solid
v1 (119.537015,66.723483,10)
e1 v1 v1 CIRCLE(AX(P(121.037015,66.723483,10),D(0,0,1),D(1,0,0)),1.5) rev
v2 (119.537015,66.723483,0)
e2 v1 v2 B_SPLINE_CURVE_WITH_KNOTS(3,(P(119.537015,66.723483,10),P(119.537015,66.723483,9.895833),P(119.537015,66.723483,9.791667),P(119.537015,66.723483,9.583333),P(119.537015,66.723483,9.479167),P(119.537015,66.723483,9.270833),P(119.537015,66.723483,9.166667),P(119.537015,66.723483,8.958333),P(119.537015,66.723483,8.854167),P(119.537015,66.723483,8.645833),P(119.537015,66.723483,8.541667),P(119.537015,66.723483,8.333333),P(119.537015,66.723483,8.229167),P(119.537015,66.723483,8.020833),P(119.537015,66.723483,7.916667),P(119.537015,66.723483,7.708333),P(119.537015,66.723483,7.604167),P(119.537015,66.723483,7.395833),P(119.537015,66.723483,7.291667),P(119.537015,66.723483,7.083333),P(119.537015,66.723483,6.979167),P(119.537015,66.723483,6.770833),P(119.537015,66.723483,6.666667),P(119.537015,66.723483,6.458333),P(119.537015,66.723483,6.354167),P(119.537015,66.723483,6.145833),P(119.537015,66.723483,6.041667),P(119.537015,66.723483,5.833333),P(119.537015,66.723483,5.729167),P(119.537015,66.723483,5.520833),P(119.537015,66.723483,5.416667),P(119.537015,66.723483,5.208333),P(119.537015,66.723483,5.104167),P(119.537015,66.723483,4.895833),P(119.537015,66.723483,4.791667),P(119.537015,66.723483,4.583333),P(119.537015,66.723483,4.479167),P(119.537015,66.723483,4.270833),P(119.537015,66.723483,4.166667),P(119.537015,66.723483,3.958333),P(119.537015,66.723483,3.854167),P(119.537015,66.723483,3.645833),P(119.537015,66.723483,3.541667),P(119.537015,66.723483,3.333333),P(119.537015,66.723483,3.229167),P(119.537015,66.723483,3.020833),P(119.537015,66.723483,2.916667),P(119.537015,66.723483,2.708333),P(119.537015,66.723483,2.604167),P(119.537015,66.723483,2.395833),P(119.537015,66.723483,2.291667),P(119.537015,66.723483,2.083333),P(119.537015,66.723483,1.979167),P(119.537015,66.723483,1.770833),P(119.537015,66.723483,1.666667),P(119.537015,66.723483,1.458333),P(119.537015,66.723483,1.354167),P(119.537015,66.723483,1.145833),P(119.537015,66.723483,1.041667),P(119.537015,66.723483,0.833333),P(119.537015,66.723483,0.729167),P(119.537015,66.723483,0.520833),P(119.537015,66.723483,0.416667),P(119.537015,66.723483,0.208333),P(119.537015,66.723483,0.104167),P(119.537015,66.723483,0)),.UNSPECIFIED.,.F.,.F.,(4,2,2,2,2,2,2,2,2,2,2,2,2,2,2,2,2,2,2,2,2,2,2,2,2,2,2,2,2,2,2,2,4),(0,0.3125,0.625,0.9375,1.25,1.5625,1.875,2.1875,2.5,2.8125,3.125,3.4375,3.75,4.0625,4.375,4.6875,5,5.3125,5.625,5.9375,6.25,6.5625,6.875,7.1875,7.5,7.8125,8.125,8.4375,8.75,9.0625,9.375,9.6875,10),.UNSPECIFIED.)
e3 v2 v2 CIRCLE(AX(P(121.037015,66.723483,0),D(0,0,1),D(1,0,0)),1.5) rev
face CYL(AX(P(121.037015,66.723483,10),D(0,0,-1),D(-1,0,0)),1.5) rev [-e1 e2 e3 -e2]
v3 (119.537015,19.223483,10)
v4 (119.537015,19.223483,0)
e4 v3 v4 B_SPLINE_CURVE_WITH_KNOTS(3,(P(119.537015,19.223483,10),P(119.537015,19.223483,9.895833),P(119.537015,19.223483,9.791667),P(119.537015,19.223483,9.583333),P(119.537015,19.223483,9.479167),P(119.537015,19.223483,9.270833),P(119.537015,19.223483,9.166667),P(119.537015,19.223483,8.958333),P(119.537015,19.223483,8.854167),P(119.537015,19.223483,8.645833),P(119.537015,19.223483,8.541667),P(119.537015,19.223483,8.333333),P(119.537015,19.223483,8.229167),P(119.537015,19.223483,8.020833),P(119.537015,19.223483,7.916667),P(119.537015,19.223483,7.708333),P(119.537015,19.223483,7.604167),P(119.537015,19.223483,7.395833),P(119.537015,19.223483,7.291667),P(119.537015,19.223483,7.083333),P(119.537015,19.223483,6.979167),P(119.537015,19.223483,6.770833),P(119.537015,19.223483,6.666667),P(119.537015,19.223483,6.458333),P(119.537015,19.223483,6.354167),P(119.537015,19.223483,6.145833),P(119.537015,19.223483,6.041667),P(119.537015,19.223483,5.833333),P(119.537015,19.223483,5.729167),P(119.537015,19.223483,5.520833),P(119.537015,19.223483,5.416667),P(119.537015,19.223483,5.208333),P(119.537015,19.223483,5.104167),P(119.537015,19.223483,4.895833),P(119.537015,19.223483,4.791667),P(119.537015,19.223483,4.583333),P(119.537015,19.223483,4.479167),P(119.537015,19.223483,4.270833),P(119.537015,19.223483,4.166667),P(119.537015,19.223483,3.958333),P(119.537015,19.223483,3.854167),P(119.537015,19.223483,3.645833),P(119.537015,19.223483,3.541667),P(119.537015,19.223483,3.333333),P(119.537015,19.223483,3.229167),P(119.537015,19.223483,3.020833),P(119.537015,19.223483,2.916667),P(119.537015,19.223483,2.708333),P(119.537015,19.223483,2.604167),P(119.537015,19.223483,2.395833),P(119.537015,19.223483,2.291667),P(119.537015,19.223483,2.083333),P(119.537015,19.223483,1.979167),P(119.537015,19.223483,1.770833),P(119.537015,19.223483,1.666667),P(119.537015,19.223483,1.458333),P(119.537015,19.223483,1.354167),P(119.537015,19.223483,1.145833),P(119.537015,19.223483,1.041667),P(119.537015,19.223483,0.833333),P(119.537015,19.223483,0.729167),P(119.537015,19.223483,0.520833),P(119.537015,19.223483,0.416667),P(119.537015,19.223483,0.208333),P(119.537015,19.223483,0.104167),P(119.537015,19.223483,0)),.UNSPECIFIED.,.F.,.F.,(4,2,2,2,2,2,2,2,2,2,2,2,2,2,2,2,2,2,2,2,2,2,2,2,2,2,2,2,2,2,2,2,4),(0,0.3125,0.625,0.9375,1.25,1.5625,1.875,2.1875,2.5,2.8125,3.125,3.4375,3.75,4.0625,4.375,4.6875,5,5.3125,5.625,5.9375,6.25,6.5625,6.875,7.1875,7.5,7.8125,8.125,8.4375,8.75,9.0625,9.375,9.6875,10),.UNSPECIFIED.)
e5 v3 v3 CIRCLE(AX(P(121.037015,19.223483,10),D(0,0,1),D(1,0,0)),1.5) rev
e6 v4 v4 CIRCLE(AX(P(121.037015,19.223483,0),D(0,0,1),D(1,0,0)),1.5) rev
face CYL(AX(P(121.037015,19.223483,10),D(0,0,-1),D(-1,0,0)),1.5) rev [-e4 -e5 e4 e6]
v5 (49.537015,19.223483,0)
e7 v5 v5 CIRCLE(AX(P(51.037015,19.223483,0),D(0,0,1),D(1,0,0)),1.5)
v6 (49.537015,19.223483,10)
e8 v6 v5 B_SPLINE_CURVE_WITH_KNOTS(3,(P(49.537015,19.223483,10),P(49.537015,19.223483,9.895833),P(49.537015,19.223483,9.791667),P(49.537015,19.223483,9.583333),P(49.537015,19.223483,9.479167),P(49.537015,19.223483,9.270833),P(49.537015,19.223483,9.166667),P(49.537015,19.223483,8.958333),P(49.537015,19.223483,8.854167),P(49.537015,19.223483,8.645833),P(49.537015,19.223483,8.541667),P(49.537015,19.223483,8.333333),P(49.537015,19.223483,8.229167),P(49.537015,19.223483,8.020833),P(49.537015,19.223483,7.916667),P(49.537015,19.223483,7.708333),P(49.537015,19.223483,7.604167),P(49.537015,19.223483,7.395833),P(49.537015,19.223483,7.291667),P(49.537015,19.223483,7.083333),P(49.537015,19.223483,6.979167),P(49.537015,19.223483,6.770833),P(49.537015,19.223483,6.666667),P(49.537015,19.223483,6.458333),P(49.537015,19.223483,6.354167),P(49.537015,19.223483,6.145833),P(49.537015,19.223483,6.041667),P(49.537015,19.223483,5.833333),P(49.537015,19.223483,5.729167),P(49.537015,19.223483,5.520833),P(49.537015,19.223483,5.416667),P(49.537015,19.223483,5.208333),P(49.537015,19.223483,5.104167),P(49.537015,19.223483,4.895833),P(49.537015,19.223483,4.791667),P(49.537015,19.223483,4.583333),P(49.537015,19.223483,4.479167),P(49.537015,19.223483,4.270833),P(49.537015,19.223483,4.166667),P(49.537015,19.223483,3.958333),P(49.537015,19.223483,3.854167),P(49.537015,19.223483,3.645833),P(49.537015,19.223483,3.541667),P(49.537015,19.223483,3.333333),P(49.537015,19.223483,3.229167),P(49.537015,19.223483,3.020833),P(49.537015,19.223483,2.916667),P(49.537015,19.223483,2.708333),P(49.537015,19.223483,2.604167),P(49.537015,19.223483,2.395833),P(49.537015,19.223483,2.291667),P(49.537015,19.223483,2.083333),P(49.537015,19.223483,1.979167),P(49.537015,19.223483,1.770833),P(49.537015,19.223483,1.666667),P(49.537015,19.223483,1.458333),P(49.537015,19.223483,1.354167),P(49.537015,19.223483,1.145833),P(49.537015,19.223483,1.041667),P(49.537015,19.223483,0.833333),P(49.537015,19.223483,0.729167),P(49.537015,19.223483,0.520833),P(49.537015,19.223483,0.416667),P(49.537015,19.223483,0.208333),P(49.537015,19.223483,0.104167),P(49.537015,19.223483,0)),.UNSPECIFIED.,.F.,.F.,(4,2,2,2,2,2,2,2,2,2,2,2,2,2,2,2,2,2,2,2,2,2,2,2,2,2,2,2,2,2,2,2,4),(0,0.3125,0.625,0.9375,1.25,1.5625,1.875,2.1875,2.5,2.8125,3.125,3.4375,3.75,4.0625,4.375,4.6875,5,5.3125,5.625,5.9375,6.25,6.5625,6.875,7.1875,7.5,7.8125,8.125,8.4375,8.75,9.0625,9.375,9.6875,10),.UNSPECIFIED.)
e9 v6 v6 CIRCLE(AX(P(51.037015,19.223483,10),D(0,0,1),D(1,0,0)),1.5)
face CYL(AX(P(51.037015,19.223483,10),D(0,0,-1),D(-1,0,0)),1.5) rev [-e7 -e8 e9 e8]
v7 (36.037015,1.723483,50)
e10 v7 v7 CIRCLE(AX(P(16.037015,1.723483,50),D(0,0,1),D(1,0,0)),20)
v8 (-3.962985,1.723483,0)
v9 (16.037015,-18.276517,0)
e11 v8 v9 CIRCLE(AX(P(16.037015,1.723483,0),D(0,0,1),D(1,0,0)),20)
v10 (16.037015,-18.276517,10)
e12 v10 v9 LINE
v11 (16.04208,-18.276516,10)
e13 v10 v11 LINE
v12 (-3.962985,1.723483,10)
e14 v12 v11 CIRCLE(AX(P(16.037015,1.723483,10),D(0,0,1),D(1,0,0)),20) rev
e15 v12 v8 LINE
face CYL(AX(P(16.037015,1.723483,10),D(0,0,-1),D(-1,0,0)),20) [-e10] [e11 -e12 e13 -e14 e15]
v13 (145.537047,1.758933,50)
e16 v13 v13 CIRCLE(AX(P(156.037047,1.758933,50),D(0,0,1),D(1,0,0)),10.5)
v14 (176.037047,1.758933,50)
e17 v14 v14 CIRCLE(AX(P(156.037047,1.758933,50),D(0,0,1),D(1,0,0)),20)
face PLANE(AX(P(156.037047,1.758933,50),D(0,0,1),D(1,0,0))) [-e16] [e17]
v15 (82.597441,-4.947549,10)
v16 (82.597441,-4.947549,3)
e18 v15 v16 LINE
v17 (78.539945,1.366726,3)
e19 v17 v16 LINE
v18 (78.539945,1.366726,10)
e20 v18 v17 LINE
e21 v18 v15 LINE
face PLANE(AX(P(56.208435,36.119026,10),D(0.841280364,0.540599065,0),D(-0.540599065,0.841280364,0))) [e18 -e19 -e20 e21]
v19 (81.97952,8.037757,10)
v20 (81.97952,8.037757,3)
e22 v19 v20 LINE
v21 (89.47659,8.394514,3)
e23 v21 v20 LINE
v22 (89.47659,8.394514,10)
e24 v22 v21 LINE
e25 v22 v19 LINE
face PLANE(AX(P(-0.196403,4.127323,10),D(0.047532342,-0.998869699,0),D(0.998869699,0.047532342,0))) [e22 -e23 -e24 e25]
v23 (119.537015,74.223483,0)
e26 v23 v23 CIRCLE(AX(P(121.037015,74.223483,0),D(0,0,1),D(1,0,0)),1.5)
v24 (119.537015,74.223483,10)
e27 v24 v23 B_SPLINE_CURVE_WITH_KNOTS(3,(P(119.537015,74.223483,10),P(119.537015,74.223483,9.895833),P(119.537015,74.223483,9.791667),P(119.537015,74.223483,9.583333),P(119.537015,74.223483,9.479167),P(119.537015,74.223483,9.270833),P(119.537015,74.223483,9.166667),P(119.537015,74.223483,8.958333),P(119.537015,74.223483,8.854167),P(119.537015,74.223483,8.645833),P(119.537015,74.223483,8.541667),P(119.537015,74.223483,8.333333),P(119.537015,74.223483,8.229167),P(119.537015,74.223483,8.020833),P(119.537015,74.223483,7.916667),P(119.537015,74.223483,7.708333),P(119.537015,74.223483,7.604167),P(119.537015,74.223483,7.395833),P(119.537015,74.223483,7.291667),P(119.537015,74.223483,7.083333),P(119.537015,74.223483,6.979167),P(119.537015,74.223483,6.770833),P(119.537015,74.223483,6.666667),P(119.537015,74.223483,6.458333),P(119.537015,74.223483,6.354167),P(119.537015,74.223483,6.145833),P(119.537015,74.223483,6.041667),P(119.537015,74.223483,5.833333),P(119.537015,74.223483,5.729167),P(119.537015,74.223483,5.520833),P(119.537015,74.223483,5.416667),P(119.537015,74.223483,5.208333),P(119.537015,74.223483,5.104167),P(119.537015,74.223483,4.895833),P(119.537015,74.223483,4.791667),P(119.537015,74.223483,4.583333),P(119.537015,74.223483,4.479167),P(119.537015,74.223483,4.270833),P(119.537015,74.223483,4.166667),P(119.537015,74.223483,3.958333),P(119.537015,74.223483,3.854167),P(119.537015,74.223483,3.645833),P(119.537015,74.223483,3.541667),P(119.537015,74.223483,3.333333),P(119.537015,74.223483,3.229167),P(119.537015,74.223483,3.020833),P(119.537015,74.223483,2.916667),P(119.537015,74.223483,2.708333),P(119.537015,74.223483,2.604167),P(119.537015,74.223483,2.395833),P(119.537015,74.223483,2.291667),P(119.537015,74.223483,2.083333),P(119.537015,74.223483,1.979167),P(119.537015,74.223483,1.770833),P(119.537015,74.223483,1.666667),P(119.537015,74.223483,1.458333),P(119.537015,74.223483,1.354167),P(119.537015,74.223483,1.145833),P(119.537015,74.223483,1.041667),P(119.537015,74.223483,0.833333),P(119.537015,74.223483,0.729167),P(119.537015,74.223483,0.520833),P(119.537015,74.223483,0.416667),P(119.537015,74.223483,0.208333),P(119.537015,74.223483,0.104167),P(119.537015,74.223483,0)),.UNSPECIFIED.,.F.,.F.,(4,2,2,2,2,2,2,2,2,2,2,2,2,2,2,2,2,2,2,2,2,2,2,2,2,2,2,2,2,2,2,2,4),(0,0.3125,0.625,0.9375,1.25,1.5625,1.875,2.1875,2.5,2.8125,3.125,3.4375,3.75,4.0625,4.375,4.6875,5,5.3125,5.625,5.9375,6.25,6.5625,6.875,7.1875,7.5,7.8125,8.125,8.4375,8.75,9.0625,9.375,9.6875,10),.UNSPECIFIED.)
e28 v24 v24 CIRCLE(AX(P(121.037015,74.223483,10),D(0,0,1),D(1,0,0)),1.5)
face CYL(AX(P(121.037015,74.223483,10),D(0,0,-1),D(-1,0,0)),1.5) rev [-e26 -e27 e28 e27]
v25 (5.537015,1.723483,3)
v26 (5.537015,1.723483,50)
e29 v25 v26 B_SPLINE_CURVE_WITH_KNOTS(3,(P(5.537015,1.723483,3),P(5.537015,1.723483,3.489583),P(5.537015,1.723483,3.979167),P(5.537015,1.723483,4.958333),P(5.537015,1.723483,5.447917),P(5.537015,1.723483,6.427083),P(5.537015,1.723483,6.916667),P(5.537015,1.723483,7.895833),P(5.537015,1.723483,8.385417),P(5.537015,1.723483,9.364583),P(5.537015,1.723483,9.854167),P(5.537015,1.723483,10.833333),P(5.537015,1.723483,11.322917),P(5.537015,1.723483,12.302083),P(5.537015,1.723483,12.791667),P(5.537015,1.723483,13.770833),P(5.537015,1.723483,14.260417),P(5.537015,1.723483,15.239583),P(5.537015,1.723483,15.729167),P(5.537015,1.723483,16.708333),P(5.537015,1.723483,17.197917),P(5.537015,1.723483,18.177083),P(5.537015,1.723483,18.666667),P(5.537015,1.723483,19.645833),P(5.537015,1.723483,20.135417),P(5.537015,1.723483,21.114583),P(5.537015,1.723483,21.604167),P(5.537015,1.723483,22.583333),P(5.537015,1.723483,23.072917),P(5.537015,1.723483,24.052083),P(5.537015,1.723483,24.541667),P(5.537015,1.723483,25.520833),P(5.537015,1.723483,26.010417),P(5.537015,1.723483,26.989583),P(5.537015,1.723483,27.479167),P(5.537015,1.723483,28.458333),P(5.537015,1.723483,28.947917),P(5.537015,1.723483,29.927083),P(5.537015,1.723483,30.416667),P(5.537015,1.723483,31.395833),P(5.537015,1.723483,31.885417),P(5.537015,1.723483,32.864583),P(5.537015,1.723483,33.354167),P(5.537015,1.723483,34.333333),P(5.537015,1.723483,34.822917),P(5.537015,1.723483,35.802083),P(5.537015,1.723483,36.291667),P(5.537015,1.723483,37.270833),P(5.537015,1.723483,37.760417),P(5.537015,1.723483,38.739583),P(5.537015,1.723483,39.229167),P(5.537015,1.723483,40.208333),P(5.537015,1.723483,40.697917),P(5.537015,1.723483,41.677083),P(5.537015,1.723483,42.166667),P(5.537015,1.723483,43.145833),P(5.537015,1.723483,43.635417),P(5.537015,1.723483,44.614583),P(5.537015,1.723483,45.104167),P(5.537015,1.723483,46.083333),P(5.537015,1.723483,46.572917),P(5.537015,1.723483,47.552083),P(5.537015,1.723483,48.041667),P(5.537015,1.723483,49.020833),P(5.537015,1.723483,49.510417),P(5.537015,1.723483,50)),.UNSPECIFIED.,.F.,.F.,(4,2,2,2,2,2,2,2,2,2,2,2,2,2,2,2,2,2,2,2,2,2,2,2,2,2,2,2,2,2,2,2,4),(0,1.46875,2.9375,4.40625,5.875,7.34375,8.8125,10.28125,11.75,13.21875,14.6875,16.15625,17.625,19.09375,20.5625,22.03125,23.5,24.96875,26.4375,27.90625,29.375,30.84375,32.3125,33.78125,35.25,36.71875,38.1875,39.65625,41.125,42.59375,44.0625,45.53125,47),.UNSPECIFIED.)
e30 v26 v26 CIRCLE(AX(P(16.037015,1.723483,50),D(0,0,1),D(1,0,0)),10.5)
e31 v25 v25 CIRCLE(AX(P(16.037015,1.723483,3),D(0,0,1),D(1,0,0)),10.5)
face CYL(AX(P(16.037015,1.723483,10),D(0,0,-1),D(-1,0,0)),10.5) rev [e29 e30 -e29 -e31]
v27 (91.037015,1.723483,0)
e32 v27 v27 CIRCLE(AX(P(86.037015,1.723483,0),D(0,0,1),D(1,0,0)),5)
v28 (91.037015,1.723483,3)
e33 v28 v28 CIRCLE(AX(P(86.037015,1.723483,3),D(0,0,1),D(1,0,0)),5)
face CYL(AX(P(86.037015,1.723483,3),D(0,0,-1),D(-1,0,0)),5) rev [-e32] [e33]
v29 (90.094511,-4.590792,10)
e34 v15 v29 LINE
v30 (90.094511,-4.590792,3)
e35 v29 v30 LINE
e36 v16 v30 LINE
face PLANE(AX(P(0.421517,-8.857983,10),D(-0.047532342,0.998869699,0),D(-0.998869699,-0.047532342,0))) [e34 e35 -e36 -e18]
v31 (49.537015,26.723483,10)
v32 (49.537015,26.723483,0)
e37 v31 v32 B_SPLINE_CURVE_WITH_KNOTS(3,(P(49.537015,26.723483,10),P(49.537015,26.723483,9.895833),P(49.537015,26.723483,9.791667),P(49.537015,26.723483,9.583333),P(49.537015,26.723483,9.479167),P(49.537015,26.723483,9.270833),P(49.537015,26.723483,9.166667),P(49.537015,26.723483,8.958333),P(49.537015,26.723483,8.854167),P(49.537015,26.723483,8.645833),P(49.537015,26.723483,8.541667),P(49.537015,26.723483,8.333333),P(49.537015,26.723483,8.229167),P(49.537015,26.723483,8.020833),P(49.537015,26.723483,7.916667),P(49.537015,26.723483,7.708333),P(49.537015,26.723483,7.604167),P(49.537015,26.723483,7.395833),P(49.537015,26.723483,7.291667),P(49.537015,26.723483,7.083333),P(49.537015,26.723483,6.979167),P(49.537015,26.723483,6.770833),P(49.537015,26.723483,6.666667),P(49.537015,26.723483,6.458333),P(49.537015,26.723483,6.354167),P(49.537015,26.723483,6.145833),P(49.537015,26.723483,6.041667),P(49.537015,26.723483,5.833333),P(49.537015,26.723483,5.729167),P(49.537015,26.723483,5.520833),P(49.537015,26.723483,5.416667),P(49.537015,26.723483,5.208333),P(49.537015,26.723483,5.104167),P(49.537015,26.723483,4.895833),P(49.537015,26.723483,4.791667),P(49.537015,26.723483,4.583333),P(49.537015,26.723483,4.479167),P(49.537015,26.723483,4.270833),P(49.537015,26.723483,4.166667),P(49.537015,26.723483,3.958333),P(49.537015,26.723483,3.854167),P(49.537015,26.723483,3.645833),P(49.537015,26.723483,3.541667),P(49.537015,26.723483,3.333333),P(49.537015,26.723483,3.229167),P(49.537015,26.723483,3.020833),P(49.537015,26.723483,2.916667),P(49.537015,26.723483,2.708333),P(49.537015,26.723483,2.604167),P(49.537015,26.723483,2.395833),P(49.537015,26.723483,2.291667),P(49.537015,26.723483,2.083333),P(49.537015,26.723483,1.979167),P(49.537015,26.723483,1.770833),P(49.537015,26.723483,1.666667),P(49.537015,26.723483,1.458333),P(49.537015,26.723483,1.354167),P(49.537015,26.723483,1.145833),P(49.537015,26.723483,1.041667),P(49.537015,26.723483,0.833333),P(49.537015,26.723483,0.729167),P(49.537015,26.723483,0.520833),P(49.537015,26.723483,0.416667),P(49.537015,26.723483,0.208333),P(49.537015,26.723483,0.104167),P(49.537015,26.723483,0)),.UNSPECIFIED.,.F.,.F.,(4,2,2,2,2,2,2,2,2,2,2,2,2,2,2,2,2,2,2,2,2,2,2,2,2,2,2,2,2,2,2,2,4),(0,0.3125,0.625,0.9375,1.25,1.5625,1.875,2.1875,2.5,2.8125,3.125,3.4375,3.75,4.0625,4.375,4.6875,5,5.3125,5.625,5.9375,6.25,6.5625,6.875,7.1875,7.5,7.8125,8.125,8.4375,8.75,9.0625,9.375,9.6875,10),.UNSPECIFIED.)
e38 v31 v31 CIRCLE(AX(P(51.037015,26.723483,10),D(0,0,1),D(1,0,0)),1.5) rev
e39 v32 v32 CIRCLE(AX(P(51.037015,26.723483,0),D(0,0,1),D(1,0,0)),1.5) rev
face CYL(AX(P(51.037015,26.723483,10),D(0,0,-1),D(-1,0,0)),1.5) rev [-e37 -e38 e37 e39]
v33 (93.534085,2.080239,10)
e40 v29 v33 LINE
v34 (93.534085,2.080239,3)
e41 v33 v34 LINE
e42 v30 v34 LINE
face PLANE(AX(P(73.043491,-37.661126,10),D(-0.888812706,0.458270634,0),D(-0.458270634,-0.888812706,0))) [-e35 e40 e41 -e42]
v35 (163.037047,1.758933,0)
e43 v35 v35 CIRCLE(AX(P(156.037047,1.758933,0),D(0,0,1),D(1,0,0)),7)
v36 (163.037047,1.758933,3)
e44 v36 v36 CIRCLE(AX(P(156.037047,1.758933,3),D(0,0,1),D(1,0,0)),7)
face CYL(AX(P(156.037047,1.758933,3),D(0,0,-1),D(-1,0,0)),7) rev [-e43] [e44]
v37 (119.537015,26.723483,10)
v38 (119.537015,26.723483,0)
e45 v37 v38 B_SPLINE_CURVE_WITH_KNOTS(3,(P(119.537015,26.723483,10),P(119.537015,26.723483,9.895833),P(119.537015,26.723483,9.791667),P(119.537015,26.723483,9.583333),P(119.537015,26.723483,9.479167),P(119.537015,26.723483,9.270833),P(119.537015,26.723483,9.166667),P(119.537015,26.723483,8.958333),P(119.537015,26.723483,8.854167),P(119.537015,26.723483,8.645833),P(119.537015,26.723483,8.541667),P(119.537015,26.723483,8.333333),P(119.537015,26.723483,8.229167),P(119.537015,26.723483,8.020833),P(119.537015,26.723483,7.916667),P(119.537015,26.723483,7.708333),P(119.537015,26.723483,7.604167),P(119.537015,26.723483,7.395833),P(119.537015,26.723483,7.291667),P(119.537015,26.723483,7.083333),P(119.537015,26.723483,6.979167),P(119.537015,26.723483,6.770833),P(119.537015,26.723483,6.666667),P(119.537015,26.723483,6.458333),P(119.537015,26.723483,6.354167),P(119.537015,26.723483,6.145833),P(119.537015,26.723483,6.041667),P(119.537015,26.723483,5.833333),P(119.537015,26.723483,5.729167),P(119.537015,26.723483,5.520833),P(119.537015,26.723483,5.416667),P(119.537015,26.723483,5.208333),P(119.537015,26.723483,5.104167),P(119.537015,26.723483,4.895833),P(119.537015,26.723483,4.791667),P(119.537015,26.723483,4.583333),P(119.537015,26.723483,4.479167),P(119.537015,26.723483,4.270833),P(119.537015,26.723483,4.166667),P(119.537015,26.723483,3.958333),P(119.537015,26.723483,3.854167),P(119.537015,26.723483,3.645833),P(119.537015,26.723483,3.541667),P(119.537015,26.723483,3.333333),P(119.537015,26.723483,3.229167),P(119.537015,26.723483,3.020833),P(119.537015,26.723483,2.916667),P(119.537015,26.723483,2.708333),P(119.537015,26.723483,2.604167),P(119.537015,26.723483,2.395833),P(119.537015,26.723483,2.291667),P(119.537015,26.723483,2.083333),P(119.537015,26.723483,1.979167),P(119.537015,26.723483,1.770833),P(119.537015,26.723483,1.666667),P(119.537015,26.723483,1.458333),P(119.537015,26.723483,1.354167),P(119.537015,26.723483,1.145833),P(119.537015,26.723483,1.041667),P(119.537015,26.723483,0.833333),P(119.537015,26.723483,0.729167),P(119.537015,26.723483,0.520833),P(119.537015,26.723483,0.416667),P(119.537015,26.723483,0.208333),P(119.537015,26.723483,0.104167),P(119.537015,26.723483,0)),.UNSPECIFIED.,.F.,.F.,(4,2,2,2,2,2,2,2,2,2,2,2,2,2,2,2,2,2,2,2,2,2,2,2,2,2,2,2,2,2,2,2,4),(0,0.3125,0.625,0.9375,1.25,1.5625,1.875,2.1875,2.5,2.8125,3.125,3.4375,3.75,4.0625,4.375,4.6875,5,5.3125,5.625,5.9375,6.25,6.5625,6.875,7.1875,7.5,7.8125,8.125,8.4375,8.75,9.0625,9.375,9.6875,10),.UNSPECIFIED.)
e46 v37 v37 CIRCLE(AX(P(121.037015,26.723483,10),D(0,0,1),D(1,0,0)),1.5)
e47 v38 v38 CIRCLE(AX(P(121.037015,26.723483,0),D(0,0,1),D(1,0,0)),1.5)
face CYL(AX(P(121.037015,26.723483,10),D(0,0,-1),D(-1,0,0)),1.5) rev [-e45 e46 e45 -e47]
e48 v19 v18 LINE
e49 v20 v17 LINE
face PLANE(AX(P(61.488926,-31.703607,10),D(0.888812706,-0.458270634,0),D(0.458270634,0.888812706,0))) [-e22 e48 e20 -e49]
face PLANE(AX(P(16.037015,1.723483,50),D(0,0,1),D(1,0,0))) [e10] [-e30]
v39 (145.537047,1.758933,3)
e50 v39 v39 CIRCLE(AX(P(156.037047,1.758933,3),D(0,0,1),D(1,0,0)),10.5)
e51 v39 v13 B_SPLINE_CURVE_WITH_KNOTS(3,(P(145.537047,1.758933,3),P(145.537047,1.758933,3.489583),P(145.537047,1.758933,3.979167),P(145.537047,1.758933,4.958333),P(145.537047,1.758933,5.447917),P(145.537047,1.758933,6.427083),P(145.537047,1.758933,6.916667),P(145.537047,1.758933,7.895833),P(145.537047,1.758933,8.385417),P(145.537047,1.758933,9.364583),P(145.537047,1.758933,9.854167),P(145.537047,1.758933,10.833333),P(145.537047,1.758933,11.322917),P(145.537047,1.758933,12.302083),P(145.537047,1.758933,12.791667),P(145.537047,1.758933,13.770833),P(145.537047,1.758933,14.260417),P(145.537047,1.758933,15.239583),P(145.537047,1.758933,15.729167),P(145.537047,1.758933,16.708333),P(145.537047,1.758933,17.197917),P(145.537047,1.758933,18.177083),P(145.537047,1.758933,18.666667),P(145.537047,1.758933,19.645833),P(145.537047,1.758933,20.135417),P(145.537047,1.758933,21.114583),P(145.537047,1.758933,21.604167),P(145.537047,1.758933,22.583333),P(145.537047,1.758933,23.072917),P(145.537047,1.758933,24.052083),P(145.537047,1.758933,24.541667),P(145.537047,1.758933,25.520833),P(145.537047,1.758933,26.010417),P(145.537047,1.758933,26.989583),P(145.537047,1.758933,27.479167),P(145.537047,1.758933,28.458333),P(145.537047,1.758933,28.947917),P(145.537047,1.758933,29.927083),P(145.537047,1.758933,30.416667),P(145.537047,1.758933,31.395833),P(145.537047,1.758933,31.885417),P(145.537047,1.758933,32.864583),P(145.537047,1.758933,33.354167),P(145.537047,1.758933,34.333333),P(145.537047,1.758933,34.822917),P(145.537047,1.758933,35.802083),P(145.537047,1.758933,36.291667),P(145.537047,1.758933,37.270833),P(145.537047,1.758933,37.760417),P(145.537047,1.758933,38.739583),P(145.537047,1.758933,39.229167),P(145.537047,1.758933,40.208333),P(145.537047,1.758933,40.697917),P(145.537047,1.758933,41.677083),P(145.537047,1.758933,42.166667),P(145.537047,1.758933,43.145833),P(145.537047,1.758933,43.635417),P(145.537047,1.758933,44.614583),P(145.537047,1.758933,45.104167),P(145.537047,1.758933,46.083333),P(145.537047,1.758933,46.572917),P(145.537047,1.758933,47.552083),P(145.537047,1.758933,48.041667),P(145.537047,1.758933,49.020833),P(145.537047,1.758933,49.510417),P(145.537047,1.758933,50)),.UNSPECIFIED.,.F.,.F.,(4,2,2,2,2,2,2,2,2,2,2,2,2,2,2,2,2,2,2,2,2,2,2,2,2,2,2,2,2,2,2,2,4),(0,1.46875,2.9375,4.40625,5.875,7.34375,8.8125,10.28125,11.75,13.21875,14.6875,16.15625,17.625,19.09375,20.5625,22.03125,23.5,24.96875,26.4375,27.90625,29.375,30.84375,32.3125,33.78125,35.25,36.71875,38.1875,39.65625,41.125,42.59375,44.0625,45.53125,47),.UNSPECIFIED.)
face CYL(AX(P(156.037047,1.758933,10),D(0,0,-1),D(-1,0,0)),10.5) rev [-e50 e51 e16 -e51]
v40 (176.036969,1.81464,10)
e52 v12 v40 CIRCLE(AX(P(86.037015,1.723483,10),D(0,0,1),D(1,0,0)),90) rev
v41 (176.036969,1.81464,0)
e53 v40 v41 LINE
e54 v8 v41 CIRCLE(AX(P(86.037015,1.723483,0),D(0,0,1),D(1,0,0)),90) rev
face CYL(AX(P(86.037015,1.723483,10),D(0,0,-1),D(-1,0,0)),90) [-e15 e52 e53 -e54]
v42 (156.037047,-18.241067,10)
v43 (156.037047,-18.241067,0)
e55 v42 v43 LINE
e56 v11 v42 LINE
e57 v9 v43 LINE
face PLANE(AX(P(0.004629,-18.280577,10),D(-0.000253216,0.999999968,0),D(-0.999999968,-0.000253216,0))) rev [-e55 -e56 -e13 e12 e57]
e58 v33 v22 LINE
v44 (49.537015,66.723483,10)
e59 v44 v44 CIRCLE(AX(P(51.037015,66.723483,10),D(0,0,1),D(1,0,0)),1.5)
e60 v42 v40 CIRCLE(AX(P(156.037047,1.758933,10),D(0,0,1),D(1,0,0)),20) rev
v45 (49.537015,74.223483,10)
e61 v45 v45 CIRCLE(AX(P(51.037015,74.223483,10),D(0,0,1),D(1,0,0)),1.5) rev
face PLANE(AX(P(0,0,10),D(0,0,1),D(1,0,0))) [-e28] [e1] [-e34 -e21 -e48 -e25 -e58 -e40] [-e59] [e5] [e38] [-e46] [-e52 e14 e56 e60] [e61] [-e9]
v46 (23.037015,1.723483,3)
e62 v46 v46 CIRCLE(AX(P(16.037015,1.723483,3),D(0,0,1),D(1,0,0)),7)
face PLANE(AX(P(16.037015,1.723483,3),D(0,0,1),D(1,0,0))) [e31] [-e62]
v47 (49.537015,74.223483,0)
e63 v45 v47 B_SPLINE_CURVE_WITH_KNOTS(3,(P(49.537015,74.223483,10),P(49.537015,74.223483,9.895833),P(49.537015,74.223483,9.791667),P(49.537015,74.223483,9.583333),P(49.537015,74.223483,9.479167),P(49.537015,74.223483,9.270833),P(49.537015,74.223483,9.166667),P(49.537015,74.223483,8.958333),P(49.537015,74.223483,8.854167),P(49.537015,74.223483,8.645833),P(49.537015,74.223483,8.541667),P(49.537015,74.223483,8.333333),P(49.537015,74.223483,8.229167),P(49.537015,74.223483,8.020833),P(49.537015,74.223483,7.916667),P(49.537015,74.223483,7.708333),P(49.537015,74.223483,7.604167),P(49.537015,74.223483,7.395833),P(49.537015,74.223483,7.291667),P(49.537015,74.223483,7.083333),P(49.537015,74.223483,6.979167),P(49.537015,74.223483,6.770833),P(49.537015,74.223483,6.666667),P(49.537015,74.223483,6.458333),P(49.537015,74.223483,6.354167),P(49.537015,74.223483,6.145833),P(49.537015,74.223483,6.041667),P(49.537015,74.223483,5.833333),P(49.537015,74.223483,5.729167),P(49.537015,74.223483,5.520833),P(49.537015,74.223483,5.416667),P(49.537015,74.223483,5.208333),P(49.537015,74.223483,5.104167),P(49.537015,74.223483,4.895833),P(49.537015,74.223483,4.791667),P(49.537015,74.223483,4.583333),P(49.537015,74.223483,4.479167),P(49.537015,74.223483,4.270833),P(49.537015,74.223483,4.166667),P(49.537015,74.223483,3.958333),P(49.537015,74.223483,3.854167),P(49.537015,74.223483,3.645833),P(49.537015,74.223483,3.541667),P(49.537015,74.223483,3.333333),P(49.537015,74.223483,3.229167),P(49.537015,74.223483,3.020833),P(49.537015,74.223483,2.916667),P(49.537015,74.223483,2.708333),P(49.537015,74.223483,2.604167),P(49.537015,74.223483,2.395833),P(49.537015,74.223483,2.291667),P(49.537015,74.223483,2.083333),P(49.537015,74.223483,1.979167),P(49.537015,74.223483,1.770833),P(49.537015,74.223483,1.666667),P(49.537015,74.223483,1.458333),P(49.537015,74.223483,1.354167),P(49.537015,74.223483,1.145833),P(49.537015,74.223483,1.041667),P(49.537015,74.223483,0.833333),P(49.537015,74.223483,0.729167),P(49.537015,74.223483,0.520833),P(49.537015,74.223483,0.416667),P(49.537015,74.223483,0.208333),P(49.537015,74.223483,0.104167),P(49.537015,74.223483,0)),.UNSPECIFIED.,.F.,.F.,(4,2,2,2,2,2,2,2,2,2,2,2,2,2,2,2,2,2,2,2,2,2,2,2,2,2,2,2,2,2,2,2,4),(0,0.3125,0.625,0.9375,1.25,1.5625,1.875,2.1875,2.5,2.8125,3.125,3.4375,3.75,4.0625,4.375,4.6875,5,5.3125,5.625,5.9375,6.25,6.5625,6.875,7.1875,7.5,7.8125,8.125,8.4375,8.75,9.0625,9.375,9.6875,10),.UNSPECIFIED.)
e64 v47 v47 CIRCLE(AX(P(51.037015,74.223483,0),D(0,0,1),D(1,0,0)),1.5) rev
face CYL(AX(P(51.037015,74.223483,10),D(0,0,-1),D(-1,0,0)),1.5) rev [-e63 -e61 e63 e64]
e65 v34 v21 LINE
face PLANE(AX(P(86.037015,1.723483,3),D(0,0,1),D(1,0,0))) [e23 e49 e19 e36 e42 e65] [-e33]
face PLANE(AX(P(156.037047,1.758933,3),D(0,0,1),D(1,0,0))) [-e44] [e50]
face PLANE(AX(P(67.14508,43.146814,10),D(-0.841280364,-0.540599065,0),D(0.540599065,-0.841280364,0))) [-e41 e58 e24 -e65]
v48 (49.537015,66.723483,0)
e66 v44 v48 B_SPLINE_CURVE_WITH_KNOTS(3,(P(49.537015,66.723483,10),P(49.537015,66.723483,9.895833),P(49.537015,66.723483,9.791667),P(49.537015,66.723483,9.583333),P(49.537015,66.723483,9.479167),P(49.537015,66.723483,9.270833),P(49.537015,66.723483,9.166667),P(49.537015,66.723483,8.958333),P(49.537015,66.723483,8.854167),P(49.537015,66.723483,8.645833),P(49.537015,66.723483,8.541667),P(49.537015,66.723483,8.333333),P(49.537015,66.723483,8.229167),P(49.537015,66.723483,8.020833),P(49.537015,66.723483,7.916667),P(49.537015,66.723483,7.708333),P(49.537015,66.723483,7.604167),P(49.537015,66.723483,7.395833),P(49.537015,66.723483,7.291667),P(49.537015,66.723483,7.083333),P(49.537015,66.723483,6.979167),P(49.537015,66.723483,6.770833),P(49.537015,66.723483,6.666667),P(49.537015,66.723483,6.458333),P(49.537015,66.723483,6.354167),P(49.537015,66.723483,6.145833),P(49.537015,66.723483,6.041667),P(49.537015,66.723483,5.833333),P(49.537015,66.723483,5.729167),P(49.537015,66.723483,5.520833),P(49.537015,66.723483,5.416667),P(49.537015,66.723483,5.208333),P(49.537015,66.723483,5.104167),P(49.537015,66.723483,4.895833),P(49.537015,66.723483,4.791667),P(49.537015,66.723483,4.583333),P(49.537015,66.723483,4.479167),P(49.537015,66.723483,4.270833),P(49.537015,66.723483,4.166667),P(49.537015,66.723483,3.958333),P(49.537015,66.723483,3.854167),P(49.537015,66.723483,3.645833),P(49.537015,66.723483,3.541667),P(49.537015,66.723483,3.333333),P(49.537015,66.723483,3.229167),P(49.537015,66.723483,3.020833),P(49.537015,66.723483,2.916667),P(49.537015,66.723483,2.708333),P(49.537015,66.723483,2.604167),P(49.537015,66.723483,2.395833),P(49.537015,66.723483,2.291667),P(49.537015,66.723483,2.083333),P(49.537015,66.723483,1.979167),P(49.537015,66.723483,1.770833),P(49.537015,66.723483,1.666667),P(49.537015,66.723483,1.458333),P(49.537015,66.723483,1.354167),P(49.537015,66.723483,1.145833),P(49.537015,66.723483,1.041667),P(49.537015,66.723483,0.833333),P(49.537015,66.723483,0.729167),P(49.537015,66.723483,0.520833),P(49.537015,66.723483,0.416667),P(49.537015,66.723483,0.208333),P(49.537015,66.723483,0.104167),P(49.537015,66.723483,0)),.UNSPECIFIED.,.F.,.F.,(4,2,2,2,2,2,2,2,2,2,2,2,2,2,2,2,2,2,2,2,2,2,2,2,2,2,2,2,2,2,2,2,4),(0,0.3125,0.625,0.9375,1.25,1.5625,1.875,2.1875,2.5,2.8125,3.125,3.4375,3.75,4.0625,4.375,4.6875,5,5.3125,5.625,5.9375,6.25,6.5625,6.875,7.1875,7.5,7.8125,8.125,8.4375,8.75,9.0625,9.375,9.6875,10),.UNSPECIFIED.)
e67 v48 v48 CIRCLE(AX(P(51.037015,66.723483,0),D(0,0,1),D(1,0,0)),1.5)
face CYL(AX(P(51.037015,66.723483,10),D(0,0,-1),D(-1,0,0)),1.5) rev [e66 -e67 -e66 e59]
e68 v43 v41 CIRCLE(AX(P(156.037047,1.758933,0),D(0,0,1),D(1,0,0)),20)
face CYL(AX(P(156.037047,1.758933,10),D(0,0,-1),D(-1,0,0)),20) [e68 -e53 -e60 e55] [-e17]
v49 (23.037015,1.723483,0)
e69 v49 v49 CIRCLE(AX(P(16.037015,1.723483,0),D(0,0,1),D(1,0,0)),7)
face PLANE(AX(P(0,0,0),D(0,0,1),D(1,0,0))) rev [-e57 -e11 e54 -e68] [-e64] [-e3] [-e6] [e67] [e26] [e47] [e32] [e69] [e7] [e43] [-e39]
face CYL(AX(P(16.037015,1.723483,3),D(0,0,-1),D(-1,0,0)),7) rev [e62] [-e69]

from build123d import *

# Parameters (mm, degrees)
BOSS_EXTRUDE8_OUTLINE_R   = 10.5
BOSS_EXTRUDE8_OUTLINE_R_2 = 1.5
BOSS_EXTRUDE8_DEPTH       = 10
SKETCH5_R                 = 10
SKETCH5_R_2               = 5
BOSS_EXTRUDE10_DEPTH      = 3
SKETCH7_R                 = 20
SKETCH7_R_2               = 10.5
BOSS_EXTRUDE11_DEPTH      = 50
SKETCH8_R                 = 20
SKETCH8_R_2               = 7
BOSS_EXTRUDE13_DEPTH      = 3


with BuildPart() as part:
    # Boss-Extrude8: read off the stored shape, not the designer's step
    # Boss-Extrude8 outline → Boss-Extrude8 (new body)
    with BuildSketch(Plane.XY):
        with BuildLine():
            ThreePointArc((176.037015378, 1.723482717), (86.037015378, 91.723482717), (-3.962984622, 1.723482717))
            ThreePointArc((-3.962984622, 1.723482717), (1.894879754, -12.418652907), (16.037015378, -18.276517283))
            Line((16.037015378, -18.276517283), (156.037046796, -18.241067052))
            ThreePointArc((156.037046796, -18.241067052), (170.166643311, -12.395730676), (176.037015378, 1.723482717))
        make_face()
        with Locations((16.037015378, 1.723482717)):
            Circle(BOSS_EXTRUDE8_OUTLINE_R, mode=Mode.SUBTRACT)
        Polygon((81.979520172, 8.037757496), (89.47659014, 8.394514031), (93.534085346, 2.080239251), (90.094510583, -4.590792062), (82.597440615, -4.947548597), (78.539945409, 1.366726183), align=None, mode=Mode.SUBTRACT)
        with Locations((51.037015378, 19.223482717)):
            Circle(BOSS_EXTRUDE8_OUTLINE_R_2, mode=Mode.SUBTRACT)
        with Locations((51.037015378, 26.723482717)):
            Circle(BOSS_EXTRUDE8_OUTLINE_R_2, mode=Mode.SUBTRACT)
        with Locations((156.037046796, 1.758932948)):
            Circle(BOSS_EXTRUDE8_OUTLINE_R, mode=Mode.SUBTRACT)
        with Locations((121.037015378, 19.223482717)):
            Circle(BOSS_EXTRUDE8_OUTLINE_R_2, mode=Mode.SUBTRACT)
        with Locations((121.037015378, 26.723482717)):
            Circle(BOSS_EXTRUDE8_OUTLINE_R_2, mode=Mode.SUBTRACT)
        with Locations((51.037015378, 66.723482717)):
            Circle(BOSS_EXTRUDE8_OUTLINE_R_2, mode=Mode.SUBTRACT)
        with Locations((51.037015378, 74.223482717)):
            Circle(BOSS_EXTRUDE8_OUTLINE_R_2, mode=Mode.SUBTRACT)
        with Locations((121.037015378, 66.723482717)):
            Circle(BOSS_EXTRUDE8_OUTLINE_R_2, mode=Mode.SUBTRACT)
        with Locations((121.037015378, 74.223482717)):
            Circle(BOSS_EXTRUDE8_OUTLINE_R_2, mode=Mode.SUBTRACT)
    extrude(amount=BOSS_EXTRUDE8_DEPTH)

    # Sketch5 → Boss-Extrude10 (add)
    with BuildSketch(Plane.XY):
        with Locations((86.037015378, 1.723482717)):
            Circle(SKETCH5_R)
        with Locations((86.037015378, 1.723482717)):
            Circle(SKETCH5_R_2, mode=Mode.SUBTRACT)
    extrude(amount=BOSS_EXTRUDE10_DEPTH)


with BuildPart() as boss_extrude11_tool:
    # Sketch7 → Boss-Extrude11 (new body)
    # profile 1 of 2: a face of its own
    with BuildSketch(Plane.XY):
        with Locations(Location((156.037046796, 1.758932948, 0), (0, 0, 270))):
            Circle(SKETCH7_R)
        with Locations(Location((156.037046796, 1.758932948, 0), (0, 0, 180))):
            Circle(SKETCH7_R_2, mode=Mode.SUBTRACT)
    # profile 2 of 2: a face of its own
    with BuildSketch(Plane.XY):
        with Locations(Location((16.037015378, 1.723482717, 0), (0, 0, 180))):
            Circle(SKETCH7_R)
        with Locations(Location((16.037015378, 1.723482717, 0), (0, 0, 180))):
            Circle(SKETCH7_R_2, mode=Mode.SUBTRACT)
    extrude(amount=BOSS_EXTRUDE11_DEPTH)


with BuildPart() as part_1:
    add(part.part)


with BuildPart() as part_2:
    # Boss-Extrude11: joined with boss_extrude11_tool
    add(part_1.part.fuse(boss_extrude11_tool.part, tol=0.00001))

    # Sketch8 → Boss-Extrude13 (add)
    # profile 1 of 2: a face of its own
    with BuildSketch(Plane.XY):
        with Locations(Location((16.037015378, 1.723482717, 0), (0, 0, 180))):
            Circle(SKETCH8_R)
        with Locations((16.037015378, 1.723482717)):
            Circle(SKETCH8_R_2, mode=Mode.SUBTRACT)
    # profile 2 of 2: a face of its own
    with BuildSketch(Plane.XY):
        with Locations(Location((156.037046796, 1.758932948, 0), (0, 0, 270))):
            Circle(SKETCH8_R)
        with Locations((156.037046796, 1.758932948)):
            Circle(SKETCH8_R_2, mode=Mode.SUBTRACT)
    extrude(amount=BOSS_EXTRUDE13_DEPTH)


solid = part_2.part
